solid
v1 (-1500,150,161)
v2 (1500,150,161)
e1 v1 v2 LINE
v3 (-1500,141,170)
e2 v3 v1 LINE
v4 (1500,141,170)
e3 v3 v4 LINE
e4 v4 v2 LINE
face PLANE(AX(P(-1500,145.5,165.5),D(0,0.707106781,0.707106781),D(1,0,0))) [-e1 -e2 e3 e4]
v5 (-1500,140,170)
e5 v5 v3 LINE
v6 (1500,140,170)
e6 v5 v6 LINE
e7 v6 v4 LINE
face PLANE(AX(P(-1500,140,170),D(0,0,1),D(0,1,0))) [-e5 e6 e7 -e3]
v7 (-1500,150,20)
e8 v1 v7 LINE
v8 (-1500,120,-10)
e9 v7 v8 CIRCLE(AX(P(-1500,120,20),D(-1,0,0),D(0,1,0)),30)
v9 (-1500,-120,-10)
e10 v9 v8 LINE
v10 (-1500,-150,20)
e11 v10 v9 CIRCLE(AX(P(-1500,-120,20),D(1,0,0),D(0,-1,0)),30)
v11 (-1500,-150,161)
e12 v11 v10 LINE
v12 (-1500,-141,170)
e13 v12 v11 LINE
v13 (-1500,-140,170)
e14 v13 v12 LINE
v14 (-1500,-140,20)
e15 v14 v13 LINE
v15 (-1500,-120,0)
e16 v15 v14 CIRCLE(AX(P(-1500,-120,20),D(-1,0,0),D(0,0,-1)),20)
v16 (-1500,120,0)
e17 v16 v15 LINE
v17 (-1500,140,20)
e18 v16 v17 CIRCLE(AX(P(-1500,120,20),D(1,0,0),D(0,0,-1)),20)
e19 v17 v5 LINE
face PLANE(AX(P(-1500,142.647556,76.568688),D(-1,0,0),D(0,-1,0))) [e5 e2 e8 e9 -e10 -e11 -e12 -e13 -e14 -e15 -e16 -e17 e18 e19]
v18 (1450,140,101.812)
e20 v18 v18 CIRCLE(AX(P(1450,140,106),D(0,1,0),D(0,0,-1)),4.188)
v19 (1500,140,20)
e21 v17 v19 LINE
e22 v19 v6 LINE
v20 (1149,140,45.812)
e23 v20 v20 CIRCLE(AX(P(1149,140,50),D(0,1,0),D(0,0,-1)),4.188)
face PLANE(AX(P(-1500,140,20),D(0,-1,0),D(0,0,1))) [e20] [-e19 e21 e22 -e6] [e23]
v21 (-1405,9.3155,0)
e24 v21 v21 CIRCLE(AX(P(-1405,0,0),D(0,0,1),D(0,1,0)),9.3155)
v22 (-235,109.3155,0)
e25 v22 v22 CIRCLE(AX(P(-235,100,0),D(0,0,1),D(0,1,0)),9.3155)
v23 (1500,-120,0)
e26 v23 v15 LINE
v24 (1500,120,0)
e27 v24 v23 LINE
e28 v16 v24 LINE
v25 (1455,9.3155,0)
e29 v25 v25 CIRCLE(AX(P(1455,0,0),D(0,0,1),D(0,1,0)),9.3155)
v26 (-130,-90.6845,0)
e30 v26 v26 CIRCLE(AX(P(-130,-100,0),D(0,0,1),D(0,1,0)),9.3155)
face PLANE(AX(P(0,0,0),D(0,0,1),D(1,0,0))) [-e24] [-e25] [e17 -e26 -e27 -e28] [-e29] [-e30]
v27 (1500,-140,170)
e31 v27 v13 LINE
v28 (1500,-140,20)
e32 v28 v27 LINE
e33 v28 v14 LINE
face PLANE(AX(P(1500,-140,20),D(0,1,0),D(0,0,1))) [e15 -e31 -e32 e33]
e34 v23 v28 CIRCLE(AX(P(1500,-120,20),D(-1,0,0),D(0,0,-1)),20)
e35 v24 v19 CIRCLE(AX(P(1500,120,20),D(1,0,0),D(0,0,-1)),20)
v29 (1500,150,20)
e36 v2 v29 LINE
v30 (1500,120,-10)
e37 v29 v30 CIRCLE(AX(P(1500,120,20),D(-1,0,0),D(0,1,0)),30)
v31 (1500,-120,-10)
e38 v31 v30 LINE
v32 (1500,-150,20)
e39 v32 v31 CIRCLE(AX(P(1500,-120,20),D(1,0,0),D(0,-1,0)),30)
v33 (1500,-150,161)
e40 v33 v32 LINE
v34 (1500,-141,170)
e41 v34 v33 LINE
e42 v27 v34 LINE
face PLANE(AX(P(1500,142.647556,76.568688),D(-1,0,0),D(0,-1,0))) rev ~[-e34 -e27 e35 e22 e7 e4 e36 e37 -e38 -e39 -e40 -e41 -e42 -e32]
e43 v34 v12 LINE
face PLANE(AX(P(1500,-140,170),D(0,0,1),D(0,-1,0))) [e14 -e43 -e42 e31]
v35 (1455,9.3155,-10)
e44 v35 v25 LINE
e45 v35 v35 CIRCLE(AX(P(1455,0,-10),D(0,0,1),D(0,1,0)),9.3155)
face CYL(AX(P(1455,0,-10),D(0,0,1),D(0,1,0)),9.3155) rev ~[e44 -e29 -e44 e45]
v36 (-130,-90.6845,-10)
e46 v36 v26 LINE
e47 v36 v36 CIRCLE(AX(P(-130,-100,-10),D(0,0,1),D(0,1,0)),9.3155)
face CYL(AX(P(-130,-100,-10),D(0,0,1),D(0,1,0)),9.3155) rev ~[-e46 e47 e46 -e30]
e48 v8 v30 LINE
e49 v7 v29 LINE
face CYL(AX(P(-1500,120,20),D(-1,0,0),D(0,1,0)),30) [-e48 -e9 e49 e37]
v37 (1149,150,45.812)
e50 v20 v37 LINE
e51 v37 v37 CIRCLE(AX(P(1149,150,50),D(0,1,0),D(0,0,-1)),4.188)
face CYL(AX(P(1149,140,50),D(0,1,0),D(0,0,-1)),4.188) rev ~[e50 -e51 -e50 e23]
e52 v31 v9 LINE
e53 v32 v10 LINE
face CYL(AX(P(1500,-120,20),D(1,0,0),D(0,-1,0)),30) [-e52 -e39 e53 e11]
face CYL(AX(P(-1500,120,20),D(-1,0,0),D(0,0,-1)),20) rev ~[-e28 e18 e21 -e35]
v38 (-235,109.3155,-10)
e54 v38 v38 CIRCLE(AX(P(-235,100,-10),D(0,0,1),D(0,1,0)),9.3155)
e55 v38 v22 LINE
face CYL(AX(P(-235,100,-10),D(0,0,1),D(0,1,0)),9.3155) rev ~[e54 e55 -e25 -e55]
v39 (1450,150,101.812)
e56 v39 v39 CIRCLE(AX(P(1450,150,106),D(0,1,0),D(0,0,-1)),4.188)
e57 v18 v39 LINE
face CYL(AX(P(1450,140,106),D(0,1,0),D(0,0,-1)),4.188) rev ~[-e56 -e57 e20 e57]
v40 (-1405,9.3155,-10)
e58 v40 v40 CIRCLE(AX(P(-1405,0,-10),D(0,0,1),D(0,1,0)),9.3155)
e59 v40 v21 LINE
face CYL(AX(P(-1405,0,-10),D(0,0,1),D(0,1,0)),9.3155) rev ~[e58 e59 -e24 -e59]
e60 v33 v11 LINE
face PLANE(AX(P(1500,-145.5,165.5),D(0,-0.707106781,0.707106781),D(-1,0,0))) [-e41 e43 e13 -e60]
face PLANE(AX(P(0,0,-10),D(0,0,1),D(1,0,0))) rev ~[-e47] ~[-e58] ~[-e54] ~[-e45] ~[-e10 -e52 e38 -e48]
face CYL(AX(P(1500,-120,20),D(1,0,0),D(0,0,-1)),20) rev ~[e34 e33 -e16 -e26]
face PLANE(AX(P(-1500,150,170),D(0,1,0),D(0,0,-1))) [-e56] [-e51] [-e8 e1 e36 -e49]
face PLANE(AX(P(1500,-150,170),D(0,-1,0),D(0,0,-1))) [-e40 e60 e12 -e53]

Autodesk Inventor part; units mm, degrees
ref_plane "YZ Plane" through (0, 0, 0) normal (1, 0, 0) x (0, 1, 0)
ref_plane "XZ Plane" through (0, 0, 0) normal (0, 1, 0) x (-1, 0, 0)
ref_plane "XY Plane" through (0, 0, 0) normal (0, 0, 1) x (1, 0, 0)
sketch "Sketch1" plane through (0, 0, 0) normal (0, 0, 1) x (1, 0, 0)
  line L0 (0, 196) -> (0, -196)
  line L1 (-2100, 0) -> (2100, 0)
  line L2 (-1500, 140) -> (1500, 140)
  line L3 (1500, 140) -> (1500, -140)
  line L4 (1500, -140) -> (-1500, -140)
  line L5 (-1500, -140) -> (-1500, 140)
  point P0 (0, 0)
  dimension "d0" = 3000
  dimension "d1" = 280
extrude "Plate1" add sketch "Sketch1" against normal blind 10
sketch "Sketch2" plane through (-1500, 140, 0) normal (0, 1, 0) x (-1, 0, 0)
  line L0 (-3000, 0) -> (0, 0)
  line L1 (0, 0) -> (0, 170)
  line L2 (0, 170) -> (-3000, 170)
  line L3 (-3000, 170) -> (-3000, 0)
edge flange "Flange1" height 180 angle 90 thickness 10 bend radius 20 thickness toward (0, 1, 0) relief tear relief width 10 relief depth 5 corner gap 10 corner form 0 edges at (0, 140, 0) (0, -140, 0) wall of the first edge with corners at (1500, 140, 0) (-1500, 140, 0) (-1500, 140, 170) (1500, 140, 170)
bend "Bend1"
corner "Corner1"
chamfer "Chamfer1" distance 9 angle 45 2 edges at (0, -150, 170) (0, 150, 170)
sketch "Sketch3" plane through (0, 0, -10) normal (0, 0, -1) x (-1, 0, 0)
  line L0 (-1500, -120) -> (1500, -120) projected
  line L1 (1500, 120) -> (1500, -120) projected
  line L2 (1500, 120) -> (-1500, 120) projected
  line L3 (-1500, -120) -> (-1500, 120) projected
  line L4 (-1500, 150) -> (1500, 150) projected
  line L5 (1500, -150) -> (-1500, -150) projected
  line L6 (303.3431, 108.3365) -> (61.6569, 108.3365) projected
  point P0 (0, 0)
  point P1 (1405, 0)
  point P2 (-1455, 0)
  point P3 (235, 100)
  point P4 (130, -100)
  dimension "d16" = 45
  dimension "d17" = 95
  dimension "d18" = 105
  dimension "d19" = 130
  dimension "d20" = 100
  dimension "d29" = 100
hole "Hole1" at (-1405, 0, -10) at (1455, 0, -10) at (-235, 100, -10) at (-130, -100, -10) direction (0, 0, 1) diameter 18.631 end through all thread size "G20.955x1.814" designation "G 1/2" standard "GB Pipe Threads without seal"
sketch "Sketch4" plane through (-1500, 140, 170) normal (0, -1, 0) x (1, 0, 0)
  line L0 (3000, -150) -> (0, -150) projected
  line L1 (3000, -180) -> (3000, -150) projected
  line L2 (0, -180) -> (3000, -180) projected
  line L3 (0, -150) -> (0, -180) projected
  line L4 (3000, -9) -> (0, -9) projected
  line L5 (3000, -150) -> (3000, -9) projected
  line L6 (3000, -150) -> (0, -150) projected
  line L7 (0, -9) -> (0, -150) projected
  point P0 (1500, -170)
  point P1 (2950, -64)
  point P2 (2649, -120)
  dimension "d30" = 50
  dimension "d31" = 116
  dimension "d32" = 351
  dimension "d33" = 60
hole "Hole2" at (1450, 140, 106) at (1149, 140, 50) direction (0, 1, 0) diameter 8.376 end through all thread size "M10x1.5" class "6H" standard "ISO Metric profile"
equation "\"d2\" = Thickness"
equation "\"d3\" = BendReliefWidth"
equation "\"d4\" = BendReliefDepth"
equation "\"d5\" = MinimumRemnant"
equation "\"d6\" = TransitionRadius"
equation "\"d10\" = CornerReliefSize"
equation "\"d11\" = GapSize"
equation "\"d12\" = JacobiRadiusSize"
equation "\"BendReliefDepth\" = 0.5 * Thickness"
equation "\"Thickness\" = 10"
equation "\"BendReliefWidth\" = 10"
equation "\"MinimumRemnant\" = 20"
equation "\"TransitionRadius\" = 10"
equation "\"CornerReliefSize\" = 40"
equation "\"GapSize\" = 10"
equation "\"JacobiRadiusSize\" = 10"
properties part number "SlipersLåda 211018001" material "Steel, Mild"
